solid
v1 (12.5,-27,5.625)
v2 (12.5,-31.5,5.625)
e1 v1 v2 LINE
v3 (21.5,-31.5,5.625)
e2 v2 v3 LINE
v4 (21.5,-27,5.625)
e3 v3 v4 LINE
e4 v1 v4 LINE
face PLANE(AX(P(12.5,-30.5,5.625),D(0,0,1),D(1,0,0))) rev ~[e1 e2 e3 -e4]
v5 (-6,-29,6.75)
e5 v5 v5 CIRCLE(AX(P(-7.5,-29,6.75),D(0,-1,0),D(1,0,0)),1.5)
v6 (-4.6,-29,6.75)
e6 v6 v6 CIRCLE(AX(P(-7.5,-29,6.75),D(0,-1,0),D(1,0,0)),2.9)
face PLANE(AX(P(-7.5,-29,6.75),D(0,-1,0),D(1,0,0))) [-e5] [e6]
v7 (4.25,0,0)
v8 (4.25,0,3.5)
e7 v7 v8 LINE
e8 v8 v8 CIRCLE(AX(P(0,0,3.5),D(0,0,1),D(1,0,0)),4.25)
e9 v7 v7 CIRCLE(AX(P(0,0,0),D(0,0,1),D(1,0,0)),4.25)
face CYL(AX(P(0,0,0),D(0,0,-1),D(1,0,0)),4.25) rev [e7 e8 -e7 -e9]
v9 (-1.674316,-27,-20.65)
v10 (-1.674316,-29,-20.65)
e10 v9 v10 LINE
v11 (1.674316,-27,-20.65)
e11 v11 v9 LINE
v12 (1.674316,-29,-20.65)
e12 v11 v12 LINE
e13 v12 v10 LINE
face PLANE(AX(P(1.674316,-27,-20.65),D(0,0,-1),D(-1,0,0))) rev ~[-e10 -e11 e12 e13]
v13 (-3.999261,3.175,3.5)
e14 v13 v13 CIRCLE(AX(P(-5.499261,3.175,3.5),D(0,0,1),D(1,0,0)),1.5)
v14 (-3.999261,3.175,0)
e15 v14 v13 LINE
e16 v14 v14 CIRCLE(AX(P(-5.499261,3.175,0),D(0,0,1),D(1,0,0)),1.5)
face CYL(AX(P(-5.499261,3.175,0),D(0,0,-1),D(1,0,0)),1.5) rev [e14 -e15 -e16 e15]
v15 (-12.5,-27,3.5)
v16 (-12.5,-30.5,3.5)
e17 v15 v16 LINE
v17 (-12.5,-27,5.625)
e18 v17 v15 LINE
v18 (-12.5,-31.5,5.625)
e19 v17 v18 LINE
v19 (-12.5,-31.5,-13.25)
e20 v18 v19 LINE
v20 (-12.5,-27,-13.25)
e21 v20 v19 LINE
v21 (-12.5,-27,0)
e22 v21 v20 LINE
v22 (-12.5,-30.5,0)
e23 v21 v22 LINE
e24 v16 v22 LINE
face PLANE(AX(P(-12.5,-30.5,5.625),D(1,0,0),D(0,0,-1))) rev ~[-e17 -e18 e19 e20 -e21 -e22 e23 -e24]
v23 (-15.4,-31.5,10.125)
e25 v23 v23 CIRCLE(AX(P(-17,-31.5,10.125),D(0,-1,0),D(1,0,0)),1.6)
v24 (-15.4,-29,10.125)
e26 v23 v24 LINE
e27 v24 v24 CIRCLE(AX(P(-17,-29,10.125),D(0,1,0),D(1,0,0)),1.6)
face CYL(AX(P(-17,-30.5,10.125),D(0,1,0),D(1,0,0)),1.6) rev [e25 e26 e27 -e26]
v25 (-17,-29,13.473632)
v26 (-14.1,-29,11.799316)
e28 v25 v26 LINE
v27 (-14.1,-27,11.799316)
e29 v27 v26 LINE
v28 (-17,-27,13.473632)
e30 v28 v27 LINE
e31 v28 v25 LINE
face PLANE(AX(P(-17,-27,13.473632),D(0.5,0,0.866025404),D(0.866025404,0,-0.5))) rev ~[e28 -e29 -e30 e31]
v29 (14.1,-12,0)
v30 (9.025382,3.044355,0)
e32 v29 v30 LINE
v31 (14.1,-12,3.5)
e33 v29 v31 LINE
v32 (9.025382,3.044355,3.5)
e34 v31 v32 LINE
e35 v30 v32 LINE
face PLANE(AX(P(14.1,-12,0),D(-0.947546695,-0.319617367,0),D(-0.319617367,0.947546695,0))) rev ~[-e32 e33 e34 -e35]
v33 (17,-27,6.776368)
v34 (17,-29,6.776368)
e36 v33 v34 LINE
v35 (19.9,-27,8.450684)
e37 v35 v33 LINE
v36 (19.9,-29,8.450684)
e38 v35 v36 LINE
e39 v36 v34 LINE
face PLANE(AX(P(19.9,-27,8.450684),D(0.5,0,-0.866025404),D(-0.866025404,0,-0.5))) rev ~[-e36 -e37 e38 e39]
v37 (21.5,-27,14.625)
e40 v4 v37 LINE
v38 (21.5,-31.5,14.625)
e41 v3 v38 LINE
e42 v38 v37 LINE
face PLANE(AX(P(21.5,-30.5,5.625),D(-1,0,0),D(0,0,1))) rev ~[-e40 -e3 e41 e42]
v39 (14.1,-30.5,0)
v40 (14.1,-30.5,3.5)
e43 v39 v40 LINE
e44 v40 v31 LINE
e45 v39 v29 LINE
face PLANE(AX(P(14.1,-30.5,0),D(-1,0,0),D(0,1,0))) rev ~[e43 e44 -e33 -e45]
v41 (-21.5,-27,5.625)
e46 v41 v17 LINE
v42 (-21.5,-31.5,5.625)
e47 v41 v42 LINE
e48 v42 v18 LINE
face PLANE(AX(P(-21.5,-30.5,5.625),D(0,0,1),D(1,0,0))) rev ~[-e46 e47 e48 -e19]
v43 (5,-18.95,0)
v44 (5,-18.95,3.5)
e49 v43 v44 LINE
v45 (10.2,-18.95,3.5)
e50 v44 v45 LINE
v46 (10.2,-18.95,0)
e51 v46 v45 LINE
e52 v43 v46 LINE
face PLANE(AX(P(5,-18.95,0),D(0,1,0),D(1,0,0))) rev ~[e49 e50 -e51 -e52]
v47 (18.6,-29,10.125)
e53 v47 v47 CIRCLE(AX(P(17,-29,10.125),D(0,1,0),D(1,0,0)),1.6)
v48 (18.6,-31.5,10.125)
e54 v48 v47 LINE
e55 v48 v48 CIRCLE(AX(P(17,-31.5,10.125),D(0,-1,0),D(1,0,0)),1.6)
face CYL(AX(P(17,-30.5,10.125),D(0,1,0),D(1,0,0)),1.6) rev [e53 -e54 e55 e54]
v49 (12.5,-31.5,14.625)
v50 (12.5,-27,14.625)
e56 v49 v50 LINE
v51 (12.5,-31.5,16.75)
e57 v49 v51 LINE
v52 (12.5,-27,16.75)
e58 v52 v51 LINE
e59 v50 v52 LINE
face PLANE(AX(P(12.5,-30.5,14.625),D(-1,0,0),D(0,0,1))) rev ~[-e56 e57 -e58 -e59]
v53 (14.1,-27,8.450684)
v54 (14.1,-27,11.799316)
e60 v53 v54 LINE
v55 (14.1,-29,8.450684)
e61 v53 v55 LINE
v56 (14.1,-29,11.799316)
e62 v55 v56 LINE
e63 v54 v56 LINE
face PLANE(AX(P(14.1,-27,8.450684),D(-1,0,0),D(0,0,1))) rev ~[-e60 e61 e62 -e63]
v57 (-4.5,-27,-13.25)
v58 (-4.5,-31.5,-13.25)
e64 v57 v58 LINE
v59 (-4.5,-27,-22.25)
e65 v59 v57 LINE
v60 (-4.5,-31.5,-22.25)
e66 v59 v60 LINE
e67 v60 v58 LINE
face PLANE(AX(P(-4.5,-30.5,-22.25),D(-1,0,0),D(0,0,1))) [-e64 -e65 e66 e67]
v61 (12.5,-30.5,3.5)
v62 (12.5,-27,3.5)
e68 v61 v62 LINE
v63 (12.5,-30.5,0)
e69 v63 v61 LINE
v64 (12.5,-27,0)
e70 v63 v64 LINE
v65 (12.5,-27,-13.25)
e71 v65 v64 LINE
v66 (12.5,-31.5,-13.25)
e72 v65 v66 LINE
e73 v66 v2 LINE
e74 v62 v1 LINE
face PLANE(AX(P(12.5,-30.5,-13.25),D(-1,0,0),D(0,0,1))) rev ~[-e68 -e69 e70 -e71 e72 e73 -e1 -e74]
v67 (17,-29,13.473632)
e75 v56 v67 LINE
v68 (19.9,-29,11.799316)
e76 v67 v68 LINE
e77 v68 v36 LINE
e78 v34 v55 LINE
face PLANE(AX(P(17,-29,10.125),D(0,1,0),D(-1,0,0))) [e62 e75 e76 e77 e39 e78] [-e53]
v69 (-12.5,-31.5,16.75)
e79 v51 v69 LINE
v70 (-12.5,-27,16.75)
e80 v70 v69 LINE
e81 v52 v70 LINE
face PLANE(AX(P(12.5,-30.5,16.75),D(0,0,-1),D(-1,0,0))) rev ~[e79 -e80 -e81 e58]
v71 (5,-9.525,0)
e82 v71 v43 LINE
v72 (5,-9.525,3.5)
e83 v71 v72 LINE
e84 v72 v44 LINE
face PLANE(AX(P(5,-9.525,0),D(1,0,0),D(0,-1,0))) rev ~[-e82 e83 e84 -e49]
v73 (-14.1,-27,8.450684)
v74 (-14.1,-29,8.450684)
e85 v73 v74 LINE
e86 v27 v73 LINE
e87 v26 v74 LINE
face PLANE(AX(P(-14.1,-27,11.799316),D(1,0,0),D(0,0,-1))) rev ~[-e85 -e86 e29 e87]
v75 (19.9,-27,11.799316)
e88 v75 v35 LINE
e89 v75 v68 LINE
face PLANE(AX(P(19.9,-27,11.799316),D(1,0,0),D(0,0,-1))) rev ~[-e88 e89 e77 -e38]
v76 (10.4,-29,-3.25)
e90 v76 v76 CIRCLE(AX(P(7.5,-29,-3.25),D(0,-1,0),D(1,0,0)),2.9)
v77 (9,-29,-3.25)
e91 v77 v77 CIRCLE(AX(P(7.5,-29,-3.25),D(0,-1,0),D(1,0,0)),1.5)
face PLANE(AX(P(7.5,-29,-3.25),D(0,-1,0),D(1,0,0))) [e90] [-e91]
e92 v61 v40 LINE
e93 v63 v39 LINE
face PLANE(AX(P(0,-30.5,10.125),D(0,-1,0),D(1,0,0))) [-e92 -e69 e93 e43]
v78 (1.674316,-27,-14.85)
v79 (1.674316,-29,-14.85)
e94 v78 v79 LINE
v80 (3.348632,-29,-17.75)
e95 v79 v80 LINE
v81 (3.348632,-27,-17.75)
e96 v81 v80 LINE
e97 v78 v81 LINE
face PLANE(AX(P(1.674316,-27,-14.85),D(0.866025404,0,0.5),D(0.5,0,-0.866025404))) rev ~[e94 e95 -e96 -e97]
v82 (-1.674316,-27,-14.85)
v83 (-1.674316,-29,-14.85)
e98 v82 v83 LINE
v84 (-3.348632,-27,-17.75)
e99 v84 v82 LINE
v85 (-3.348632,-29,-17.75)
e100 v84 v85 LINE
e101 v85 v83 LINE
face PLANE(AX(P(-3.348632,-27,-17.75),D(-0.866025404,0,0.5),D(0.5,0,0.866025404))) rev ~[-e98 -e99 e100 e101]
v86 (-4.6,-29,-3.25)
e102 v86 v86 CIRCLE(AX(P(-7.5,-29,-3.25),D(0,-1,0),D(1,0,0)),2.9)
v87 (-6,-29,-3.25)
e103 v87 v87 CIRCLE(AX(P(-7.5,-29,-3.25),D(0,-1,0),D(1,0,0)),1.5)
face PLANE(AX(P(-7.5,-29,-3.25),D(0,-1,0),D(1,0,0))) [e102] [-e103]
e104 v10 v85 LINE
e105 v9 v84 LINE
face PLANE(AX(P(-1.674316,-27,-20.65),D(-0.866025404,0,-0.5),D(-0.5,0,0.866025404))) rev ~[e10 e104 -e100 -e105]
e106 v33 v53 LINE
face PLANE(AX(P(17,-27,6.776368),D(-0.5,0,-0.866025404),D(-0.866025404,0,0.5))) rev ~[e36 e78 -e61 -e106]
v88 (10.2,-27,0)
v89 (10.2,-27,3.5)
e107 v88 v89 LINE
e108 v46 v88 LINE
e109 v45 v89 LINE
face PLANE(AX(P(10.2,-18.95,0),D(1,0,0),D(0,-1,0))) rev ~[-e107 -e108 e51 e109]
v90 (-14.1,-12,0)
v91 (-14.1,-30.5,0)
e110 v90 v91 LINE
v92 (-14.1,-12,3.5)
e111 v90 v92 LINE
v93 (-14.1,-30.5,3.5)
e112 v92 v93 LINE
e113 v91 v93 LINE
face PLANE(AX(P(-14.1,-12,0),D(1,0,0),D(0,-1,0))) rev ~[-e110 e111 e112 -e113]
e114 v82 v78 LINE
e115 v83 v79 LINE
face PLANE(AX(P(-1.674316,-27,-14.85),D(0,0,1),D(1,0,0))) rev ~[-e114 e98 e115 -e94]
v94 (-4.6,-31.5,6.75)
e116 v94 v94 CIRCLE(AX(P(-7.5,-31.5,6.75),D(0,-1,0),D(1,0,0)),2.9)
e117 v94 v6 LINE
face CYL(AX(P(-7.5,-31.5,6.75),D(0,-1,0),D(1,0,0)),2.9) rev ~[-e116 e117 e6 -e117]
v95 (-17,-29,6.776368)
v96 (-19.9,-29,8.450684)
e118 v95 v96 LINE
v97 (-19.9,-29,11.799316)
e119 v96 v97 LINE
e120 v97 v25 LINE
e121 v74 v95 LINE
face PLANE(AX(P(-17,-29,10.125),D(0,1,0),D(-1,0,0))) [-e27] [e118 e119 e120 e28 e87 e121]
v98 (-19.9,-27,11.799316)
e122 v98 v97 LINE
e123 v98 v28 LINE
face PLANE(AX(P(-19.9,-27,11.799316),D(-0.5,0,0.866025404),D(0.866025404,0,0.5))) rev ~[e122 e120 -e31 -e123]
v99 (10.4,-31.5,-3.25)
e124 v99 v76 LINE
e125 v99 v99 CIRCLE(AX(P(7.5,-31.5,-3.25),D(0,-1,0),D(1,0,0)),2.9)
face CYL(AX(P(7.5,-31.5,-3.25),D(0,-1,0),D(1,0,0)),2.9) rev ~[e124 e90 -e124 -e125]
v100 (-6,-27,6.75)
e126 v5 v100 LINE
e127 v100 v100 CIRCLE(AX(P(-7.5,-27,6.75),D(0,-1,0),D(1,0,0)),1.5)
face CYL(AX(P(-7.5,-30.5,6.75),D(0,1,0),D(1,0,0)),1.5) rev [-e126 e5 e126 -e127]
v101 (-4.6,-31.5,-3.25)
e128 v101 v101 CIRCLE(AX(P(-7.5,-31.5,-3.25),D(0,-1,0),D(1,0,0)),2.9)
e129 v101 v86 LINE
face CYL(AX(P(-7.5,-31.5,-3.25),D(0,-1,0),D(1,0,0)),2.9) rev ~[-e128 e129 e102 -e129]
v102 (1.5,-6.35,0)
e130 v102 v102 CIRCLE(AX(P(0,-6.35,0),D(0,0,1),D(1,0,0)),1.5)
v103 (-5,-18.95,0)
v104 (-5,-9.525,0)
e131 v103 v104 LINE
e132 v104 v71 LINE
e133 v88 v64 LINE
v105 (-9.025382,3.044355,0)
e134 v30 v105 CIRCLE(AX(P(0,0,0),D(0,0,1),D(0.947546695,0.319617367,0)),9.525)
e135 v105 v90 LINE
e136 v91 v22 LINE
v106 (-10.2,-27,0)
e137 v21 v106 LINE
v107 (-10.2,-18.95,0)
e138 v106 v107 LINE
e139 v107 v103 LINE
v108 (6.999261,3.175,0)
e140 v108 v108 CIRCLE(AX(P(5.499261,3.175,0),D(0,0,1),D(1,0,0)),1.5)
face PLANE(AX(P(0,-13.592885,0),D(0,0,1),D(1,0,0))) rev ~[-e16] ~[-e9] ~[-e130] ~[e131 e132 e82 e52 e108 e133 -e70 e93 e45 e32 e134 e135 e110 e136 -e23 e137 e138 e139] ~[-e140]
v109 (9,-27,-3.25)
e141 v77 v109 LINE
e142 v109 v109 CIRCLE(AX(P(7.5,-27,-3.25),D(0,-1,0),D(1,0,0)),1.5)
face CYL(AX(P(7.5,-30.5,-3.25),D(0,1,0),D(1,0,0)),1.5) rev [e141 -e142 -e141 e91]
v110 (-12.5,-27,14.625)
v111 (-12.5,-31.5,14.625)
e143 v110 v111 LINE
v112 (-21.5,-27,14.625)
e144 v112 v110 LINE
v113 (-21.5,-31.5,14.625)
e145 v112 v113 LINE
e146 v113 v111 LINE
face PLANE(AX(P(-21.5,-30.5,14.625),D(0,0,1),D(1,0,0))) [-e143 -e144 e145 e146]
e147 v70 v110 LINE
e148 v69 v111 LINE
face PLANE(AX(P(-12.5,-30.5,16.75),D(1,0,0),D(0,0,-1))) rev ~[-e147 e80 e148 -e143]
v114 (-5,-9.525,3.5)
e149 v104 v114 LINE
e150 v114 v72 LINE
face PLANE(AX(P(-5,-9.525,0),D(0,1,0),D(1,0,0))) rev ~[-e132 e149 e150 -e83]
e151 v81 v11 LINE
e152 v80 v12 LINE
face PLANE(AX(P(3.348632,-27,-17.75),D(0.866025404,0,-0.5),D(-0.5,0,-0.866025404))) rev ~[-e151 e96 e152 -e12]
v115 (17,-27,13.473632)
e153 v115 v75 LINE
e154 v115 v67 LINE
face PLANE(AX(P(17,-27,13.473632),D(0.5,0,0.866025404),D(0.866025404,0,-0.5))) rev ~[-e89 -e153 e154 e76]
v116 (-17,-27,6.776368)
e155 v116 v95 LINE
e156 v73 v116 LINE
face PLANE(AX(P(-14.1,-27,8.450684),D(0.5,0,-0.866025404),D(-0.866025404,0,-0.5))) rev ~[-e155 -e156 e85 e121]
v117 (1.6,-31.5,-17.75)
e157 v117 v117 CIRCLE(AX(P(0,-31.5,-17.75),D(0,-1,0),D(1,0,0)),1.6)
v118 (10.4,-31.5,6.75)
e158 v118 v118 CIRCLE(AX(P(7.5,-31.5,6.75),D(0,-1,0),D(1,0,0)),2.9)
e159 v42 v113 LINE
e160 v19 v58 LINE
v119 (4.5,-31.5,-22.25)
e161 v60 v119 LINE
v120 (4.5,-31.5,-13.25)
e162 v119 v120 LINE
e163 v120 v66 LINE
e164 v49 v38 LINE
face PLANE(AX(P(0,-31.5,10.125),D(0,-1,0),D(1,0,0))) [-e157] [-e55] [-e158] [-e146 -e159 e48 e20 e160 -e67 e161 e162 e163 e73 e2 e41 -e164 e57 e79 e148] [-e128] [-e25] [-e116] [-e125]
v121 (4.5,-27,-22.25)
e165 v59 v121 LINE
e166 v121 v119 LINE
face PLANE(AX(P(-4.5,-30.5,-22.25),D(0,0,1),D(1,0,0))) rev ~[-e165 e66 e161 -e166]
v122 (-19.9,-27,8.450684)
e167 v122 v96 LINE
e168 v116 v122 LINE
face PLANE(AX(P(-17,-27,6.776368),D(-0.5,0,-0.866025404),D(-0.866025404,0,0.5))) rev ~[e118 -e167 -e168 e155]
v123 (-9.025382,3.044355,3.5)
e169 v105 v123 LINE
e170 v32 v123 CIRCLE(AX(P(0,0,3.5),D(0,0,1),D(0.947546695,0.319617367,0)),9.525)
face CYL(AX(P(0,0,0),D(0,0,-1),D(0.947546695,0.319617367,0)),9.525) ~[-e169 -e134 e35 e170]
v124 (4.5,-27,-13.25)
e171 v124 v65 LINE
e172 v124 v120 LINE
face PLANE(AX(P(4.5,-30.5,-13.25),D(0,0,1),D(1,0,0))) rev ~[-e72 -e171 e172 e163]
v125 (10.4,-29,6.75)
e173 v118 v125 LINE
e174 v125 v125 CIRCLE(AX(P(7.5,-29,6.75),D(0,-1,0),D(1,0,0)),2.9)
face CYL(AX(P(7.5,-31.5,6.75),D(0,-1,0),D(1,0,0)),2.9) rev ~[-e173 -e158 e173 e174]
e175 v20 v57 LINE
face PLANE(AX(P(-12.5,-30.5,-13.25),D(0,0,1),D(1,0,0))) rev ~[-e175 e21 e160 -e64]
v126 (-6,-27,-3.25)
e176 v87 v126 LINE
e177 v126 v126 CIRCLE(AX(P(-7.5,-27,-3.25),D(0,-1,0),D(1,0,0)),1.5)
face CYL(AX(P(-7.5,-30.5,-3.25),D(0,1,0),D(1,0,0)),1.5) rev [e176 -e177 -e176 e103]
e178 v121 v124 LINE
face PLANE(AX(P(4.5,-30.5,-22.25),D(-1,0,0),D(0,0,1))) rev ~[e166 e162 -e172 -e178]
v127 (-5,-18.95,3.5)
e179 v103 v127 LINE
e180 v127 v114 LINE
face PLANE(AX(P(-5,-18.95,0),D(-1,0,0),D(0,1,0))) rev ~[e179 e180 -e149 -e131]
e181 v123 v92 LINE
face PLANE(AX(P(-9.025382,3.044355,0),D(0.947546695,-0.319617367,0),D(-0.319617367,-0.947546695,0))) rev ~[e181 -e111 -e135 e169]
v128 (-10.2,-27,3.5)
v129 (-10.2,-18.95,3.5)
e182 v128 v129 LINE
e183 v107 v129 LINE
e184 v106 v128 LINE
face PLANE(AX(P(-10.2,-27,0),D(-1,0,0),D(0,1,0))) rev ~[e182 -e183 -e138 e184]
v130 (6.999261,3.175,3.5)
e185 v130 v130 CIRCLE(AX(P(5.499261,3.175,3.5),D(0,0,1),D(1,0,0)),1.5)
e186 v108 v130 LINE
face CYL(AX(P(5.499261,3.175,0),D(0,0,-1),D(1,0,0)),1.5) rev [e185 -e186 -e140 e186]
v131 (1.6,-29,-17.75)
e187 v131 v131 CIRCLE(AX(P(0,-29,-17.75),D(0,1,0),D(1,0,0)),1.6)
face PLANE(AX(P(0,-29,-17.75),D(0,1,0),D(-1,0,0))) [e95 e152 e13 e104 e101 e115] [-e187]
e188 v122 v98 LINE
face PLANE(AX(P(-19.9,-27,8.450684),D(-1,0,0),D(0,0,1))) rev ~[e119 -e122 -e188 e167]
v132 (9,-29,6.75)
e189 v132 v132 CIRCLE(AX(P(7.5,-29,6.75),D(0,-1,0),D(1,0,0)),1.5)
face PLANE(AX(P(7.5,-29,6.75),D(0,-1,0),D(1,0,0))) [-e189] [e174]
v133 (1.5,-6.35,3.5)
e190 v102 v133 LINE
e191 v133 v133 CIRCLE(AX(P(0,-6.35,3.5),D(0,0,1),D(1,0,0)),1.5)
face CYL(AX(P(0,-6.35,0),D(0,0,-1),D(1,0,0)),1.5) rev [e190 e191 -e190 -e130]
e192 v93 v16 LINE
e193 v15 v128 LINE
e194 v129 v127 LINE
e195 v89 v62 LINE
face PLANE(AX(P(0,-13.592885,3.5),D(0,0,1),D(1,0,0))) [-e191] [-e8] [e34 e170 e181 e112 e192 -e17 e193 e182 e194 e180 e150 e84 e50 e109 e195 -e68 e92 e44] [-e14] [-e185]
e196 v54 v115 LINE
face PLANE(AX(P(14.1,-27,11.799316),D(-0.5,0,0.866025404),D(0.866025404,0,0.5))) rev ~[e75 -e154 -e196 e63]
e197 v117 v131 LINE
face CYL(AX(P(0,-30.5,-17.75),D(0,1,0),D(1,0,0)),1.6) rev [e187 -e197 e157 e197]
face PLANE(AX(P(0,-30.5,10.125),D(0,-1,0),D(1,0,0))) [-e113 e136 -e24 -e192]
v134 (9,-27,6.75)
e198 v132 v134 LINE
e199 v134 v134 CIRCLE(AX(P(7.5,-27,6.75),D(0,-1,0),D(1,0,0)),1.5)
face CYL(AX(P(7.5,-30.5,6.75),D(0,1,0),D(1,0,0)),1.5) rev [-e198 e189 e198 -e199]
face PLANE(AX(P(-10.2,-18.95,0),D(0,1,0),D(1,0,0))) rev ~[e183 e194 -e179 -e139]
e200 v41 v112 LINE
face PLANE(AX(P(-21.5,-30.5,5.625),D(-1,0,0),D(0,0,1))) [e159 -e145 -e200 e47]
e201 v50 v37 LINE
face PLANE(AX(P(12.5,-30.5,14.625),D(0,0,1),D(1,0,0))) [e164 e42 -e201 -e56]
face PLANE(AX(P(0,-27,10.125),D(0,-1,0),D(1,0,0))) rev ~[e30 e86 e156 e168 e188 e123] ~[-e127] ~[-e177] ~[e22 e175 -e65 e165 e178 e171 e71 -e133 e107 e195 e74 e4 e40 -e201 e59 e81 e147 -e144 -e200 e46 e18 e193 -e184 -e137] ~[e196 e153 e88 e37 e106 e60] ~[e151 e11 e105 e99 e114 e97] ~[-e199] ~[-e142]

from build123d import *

# Parameters (mm, degrees)
F0_R          = 1.5
F0_R_2        = 4.25
F1_DEPTH      = 3.5
F2_R          = 1.5
F2_W          = 9
F2_H          = 9
F2_R_2        = 1.6
F2_W_2        = 25
F2_H_2        = 3.5
F3_DEPTH      = 3.5
F3_DEPTH_BACK = 1
F4_R          = 1.6
F5_DEPTH      = 2
F6_R          = 2.9
F6_R_2        = 1.5
F7_DEPTH      = 2.5


# Not quite as in the source:
# - a feature names something its author has since deleted; it is built from what else it names


with BuildPart() as f1:
    # F0 (on Top) → F1 (new body)
    with BuildSketch(Plane.XY):
        with BuildLine():
            Line((-14.1, -30.5), (0, -30.5))
            Line((0, -30.5), (14.1, -30.5))
            Line((14.1, -30.5), (14.1, -12))
            Line((14.1, -12), (9.025382269, 3.044355416))
            ThreePointArc((9.025382269, 3.044355416), (0, 9.525), (-9.025382269, 3.044355416))
            Line((-9.025382269, 3.044355416), (-14.1, -12))
            Line((-14.1, -12), (-14.1, -30.5))
        make_face()
        Polygon((10.2, -27), (0, -27), (-10.2, -27), (-10.2, -18.95), (-5, -18.95), (-5, -9.525), (0, -9.525), (5, -9.525), (5, -18.95), (10.2, -18.95), align=None, mode=Mode.SUBTRACT)
        with Locations((-5.499261314, 3.175)):
            Circle(F0_R, mode=Mode.SUBTRACT)
        with Locations((0, -6.35)):
            Circle(F0_R, mode=Mode.SUBTRACT)
        Circle(F0_R_2, mode=Mode.SUBTRACT)
        with Locations((5.499261314, 3.175)):
            Circle(F0_R, mode=Mode.SUBTRACT)
    extrude(amount=F1_DEPTH)

    # F2 (on face) → F3 (join, two sides)
    with BuildSketch(Plane.XZ.offset(30.5)) as f3_sk:
        Polygon((12.5, 16.75), (-12.5, 16.75), (-12.5, 14.625), (-12.5, 5.625), (-12.5, 3.5), (12.5, 3.5), (12.5, 5.625), (12.5, 14.625), align=None)
        with Locations((-7.5, 6.75)):
            Circle(F2_R, mode=Mode.SUBTRACT)
        with Locations((7.5, 6.75)):
            Circle(F2_R, mode=Mode.SUBTRACT)
        Polygon((12.5, 0), (-12.5, 0), (-12.5, -13.25), (-4.5, -13.25), (4.5, -13.25), (12.5, -13.25), align=None)
        with Locations((-7.5, -3.25)):
            Circle(F2_R, mode=Mode.SUBTRACT)
        with Locations((7.5, -3.25)):
            Circle(F2_R, mode=Mode.SUBTRACT)
        with Locations((-17, 10.125)):
            Rectangle(F2_W, F2_H)
        with Locations((-17, 10.125)):
            Circle(F2_R_2, mode=Mode.SUBTRACT)
        with Locations((17, 10.125)):
            Rectangle(F2_W, F2_H)
        with Locations((17, 10.125)):
            Circle(F2_R_2, mode=Mode.SUBTRACT)
        with Locations((0, -17.75)):
            Rectangle(F2_W, F2_H)
        with Locations((0, -17.75)):
            Circle(F2_R_2, mode=Mode.SUBTRACT)
        with Locations((0, 1.75)):
            Rectangle(F2_W_2, F2_H_2)
    extrude(amount=-F3_DEPTH)
    extrude(f3_sk.sketch, amount=F3_DEPTH_BACK)

    # F4 (on face) → F5 (cut)
    with BuildSketch(Plane(origin=(0, -27, 0), x_dir=(-1, 0, 0), z_dir=(0, 1, 0))):
        Polygon((-19.9, 11.7993157806), (-19.9, 8.4506842194), (-17, 6.7763684387), (-14.1, 8.4506842194), (-14.1, 11.7993157806), (-17, 13.4736315613), align=None)
        with Locations((-17, 10.125)):
            Circle(F4_R, mode=Mode.SUBTRACT)
        Polygon((17, 13.4736315613), (14.1, 11.7993157806), (14.1, 8.4506842194), (17, 6.7763684387), (19.9, 8.4506842194), (19.9, 11.7993157806), align=None)
        with Locations((17, 10.125)):
            Circle(F4_R, mode=Mode.SUBTRACT)
        Polygon((1.6743157806, -14.85), (-1.6743157806, -14.85), (-3.3486315613, -17.75), (-1.6743157806, -20.65), (1.6743157806, -20.65), (3.3486315613, -17.75), align=None)
        with Locations((0, -17.75)):
            Circle(F4_R, mode=Mode.SUBTRACT)
    extrude(amount=-F5_DEPTH, mode=Mode.SUBTRACT)

    # F6 (on face) → F7 (cut)
    with BuildSketch(Plane.XZ.offset(31.5)):
        with Locations((-7.5, 6.75)):
            Circle(F6_R)
        with Locations((-7.5, 6.75)):
            Circle(F6_R_2, mode=Mode.SUBTRACT)
        with Locations((7.5, 6.75)):
            Circle(F6_R)
        with Locations((7.5, 6.75)):
            Circle(F6_R_2, mode=Mode.SUBTRACT)
        with Locations((7.5, -3.25)):
            Circle(F6_R)
        with Locations((7.5, -3.25)):
            Circle(F6_R_2, mode=Mode.SUBTRACT)
        with Locations((-7.5, -3.25)):
            Circle(F6_R)
        with Locations((-7.5, -3.25)):
            Circle(F6_R_2, mode=Mode.SUBTRACT)
    extrude(amount=-F7_DEPTH, mode=Mode.SUBTRACT)


solid = f1.part
